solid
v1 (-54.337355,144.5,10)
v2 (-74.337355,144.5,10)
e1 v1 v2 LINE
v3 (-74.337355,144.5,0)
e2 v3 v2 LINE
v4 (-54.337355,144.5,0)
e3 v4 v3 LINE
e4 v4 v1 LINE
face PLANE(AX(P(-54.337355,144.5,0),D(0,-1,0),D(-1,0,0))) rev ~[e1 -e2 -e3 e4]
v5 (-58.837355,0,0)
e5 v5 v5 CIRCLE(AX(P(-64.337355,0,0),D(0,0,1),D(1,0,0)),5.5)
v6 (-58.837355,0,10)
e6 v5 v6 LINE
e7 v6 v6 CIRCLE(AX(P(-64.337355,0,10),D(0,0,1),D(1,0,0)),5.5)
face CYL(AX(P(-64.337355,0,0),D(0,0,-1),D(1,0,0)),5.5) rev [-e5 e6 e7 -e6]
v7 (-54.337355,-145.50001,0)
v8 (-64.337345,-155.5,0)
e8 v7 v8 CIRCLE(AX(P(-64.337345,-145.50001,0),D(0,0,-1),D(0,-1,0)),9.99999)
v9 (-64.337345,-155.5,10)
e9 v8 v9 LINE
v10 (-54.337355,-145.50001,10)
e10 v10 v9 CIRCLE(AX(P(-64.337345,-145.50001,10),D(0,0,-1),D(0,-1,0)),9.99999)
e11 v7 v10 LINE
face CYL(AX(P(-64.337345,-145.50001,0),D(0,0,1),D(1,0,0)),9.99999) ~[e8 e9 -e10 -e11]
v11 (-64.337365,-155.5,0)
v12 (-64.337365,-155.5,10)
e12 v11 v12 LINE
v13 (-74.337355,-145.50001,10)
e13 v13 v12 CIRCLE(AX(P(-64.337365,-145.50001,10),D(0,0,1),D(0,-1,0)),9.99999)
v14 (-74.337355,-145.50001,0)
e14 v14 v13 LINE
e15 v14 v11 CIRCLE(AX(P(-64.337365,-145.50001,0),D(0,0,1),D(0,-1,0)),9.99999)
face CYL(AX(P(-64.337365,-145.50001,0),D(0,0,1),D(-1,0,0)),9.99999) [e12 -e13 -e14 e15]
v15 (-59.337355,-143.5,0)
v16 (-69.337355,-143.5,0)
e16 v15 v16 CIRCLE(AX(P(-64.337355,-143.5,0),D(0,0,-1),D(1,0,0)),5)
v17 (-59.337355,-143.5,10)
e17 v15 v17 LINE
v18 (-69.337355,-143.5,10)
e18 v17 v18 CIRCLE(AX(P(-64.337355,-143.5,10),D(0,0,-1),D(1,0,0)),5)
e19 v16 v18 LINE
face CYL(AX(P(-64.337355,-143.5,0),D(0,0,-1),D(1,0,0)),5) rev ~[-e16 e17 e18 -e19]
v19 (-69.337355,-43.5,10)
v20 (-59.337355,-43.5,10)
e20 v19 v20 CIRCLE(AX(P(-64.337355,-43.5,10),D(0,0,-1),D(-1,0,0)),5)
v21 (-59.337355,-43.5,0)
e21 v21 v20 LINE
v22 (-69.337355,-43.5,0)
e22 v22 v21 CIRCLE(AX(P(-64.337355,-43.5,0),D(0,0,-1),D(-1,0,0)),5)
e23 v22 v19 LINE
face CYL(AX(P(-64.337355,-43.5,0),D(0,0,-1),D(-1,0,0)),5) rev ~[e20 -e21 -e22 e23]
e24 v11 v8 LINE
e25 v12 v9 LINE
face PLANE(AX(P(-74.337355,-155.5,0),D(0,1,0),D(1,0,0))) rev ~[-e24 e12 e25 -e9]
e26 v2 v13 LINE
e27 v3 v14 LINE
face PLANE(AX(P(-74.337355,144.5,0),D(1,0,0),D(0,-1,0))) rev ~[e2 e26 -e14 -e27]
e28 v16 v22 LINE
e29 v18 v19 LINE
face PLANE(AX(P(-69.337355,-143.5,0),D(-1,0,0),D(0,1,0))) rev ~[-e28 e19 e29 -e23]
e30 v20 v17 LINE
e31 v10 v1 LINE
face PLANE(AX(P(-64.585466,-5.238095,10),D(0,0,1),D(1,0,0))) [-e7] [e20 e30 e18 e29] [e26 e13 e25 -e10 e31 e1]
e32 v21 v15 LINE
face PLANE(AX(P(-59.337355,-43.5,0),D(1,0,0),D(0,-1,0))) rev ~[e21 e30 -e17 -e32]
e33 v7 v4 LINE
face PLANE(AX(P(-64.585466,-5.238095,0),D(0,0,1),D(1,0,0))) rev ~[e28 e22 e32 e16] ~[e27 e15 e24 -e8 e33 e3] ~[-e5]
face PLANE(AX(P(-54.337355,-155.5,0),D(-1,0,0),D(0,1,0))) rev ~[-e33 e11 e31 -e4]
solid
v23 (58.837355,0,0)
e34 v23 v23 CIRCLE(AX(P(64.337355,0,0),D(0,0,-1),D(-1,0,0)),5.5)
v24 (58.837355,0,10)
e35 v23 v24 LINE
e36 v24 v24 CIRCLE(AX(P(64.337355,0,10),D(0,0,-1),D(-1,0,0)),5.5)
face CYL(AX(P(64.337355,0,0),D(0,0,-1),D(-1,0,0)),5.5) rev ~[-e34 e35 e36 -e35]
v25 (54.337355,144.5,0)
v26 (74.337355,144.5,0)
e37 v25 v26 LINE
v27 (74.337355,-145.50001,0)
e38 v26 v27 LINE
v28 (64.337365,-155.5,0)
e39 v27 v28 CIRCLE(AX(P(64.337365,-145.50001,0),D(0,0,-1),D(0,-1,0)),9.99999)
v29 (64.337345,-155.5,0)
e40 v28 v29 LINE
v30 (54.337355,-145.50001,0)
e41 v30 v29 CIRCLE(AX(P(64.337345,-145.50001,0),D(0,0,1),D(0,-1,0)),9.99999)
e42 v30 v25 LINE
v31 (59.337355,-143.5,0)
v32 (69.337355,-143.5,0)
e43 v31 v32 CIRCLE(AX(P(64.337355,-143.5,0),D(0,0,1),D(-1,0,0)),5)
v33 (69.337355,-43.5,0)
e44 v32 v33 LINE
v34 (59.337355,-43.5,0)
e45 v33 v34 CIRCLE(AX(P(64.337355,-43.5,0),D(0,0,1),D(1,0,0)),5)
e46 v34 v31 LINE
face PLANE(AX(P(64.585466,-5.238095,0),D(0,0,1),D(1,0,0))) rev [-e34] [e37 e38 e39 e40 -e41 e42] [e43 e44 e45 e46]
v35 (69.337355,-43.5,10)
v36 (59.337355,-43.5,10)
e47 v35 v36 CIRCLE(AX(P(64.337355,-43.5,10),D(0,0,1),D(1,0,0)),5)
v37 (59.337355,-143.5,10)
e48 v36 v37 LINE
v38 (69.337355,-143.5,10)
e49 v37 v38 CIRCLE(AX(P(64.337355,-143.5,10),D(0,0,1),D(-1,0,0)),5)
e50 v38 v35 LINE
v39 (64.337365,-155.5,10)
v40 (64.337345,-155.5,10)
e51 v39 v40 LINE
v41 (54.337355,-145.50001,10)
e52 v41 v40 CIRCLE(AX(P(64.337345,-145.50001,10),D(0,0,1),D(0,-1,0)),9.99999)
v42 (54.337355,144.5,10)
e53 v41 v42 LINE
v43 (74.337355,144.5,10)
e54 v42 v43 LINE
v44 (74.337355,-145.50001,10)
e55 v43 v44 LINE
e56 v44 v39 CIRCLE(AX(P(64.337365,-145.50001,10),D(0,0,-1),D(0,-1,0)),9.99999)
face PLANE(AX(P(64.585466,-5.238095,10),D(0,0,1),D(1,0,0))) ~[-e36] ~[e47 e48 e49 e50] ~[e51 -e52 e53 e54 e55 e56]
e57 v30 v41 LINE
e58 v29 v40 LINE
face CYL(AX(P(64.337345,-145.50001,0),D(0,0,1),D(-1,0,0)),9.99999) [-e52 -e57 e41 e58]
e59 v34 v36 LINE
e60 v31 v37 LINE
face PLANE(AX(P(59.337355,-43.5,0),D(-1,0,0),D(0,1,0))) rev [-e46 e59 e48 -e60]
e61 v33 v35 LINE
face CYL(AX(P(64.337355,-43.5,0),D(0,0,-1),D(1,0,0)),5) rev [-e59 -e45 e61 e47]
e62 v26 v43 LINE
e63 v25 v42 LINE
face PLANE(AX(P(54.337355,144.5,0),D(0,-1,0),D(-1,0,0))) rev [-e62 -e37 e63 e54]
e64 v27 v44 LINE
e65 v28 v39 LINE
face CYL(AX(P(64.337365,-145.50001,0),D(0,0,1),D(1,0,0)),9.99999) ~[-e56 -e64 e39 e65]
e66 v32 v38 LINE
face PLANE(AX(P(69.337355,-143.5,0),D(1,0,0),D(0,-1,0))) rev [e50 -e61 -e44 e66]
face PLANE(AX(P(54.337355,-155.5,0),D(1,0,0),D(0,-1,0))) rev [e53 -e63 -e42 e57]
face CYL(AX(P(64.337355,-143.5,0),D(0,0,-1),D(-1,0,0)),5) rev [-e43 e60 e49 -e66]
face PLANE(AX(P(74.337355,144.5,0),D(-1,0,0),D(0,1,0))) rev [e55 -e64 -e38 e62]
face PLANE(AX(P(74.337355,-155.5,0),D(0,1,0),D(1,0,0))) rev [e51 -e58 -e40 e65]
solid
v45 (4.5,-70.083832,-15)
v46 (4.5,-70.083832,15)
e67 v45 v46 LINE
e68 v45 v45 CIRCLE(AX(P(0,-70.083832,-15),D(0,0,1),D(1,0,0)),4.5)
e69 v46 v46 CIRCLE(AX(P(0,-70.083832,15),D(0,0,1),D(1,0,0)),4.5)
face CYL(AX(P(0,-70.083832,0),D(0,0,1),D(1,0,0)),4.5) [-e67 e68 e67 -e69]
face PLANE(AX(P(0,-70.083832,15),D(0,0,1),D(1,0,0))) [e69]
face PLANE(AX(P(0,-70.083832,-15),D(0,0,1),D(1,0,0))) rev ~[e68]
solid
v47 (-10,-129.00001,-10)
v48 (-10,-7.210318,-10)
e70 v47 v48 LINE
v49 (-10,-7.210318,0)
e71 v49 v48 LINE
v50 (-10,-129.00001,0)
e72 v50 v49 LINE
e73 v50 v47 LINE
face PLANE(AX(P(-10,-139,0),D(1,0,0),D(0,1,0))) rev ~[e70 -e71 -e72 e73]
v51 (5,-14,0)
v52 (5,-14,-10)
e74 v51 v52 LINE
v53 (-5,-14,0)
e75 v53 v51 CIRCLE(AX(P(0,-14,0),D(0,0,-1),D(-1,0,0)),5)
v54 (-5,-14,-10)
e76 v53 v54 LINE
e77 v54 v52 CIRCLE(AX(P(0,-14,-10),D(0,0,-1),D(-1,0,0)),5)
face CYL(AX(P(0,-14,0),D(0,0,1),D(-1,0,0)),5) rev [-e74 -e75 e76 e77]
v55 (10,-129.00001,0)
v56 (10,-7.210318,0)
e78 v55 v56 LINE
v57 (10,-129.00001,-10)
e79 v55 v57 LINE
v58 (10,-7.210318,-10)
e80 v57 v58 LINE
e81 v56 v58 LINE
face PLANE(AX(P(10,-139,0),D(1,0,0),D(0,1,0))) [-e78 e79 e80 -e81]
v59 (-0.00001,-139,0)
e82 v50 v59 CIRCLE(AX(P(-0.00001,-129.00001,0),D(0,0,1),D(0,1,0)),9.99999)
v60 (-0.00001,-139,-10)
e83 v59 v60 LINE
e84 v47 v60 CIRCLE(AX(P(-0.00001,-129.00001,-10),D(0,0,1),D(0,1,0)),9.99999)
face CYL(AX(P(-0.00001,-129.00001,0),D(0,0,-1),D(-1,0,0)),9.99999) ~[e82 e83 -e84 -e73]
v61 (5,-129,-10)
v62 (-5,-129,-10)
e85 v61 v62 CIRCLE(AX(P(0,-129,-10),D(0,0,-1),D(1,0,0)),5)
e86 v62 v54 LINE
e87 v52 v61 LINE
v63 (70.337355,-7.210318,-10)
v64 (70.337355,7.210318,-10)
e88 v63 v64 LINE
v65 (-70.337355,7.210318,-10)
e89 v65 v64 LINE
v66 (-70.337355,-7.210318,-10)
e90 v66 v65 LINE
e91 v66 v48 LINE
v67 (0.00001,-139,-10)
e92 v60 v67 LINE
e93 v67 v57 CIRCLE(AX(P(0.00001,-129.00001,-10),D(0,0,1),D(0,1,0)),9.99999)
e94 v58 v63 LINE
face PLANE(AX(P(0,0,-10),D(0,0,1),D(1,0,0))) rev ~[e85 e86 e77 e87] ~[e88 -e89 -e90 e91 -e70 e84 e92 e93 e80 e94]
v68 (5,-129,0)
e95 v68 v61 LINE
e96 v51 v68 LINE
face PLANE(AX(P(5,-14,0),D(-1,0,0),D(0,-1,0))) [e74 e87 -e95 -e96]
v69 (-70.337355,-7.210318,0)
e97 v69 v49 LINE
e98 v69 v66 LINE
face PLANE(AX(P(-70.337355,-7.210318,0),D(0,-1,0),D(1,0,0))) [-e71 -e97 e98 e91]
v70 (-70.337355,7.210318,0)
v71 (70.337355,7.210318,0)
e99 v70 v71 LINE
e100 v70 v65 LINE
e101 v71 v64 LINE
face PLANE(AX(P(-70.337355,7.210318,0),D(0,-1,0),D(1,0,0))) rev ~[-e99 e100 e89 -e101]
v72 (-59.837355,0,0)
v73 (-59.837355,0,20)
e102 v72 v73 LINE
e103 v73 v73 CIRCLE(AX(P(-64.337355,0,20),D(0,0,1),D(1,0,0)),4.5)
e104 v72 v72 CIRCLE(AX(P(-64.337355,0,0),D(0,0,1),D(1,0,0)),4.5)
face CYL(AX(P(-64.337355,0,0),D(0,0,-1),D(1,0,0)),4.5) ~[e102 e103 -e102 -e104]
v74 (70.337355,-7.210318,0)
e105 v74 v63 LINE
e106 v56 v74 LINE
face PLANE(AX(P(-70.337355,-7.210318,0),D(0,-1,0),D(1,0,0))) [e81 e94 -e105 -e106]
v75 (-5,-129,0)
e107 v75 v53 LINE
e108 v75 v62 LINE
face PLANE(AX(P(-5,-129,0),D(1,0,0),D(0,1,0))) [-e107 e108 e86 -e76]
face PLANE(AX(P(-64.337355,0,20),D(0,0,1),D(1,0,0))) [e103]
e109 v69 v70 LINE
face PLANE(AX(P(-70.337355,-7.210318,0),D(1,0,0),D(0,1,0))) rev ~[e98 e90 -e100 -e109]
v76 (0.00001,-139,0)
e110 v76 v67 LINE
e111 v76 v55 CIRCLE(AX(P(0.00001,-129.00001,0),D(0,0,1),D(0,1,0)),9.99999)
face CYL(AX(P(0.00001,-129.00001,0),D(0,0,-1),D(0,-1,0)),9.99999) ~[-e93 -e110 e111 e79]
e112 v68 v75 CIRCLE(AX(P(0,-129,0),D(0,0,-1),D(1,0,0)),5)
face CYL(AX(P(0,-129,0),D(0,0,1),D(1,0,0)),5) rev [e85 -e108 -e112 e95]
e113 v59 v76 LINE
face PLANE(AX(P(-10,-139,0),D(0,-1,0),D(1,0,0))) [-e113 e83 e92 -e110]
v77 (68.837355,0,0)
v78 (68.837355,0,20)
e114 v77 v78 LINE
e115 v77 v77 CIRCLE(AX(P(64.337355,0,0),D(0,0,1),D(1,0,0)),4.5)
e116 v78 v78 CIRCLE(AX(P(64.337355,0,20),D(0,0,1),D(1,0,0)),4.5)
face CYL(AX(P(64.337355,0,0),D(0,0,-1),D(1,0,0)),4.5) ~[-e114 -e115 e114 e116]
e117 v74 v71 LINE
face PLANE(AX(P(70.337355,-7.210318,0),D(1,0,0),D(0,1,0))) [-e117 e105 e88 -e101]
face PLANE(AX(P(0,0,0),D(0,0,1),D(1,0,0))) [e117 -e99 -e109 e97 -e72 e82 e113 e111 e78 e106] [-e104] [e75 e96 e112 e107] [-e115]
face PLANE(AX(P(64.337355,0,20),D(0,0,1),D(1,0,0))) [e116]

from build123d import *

# Parameters (mm, degrees)
F0_W      = 140.6747102737
F0_H      = 14.4206369296
F1_DEPTH  = 10
F2_R      = 4.5
F3_DEPTH  = 20
F4_W      = 16
F4_H      = 14.4206369296
F4_R      = 5.5
F5_DEPTH  = 10
F7_R      = 4.5
F8_DEPTH  = 15
F9_W      = 20
F9_H      = 131.7896815352
F10_DEPTH = 10
F11_R     = 9.99999
F12_R     = 9.99999
F13_R     = 9.99999


# Not quite as in the source:
# - a fillet or chamfer is up to 0.001 mm smaller than in the source, because OpenCascade refuses the exact size


with BuildPart() as f1:
    # F0 (on Top) → F1 (new body)
    with BuildSketch(Plane.XY):
        Rectangle(F0_W, F0_H)
    extrude(amount=-F1_DEPTH)

    # F2 (on face) → F3 (join)
    with BuildSketch(Plane.XY):
        with Locations((-64.3373551369, 0)):
            Circle(F2_R)
        with Locations((64.3373551369, 0)):
            Circle(F2_R)
    extrude(amount=F3_DEPTH)

    # F9 (on face) → F10 (join, through all)
    with BuildSketch(Plane.XY):
        with Locations((0, -73.1051592324)):
            Rectangle(F9_W, F9_H)
        with BuildLine():
            ThreePointArc((-5, -14), (0, -9), (5, -14))
            Line((5, -14), (5, -129))
            ThreePointArc((5, -129), (0, -134), (-5, -129))
            Line((-5, -129), (-5, -14))
        make_face(mode=Mode.SUBTRACT)
    extrude(amount=-F10_DEPTH)

    # F13 (radius 10 in the source; OpenCascade refuses exactly that, so slightly less here)
    f13_edges = [f1.edges().sort_by_distance(p)[0] for p in [
        (-10, -139, -5),
        (10, -139, -5),
    ]]
    fillet(f13_edges, radius=F13_R)


with BuildPart() as f5:
    # F4 (on face) → F5 (new body)
    with BuildSketch(Plane.XY):
        Polygon((-54.3373551369, 144.5), (-74.3373551369, 144.5), (-74.3373551369, -155.5), (-54.3373551369, -155.5), (-54.3373551369, -7.2103184648), (-70.3373551369, -7.2103184648), (-70.3373551369, 7.2103184648), (-54.3373551369, 7.2103184648), align=None)
        with BuildLine():
            ThreePointArc((-69.3373551369, -43.5), (-64.3373551369, -38.5), (-59.3373551369, -43.5))
            Line((-59.3373551369, -43.5), (-59.3373551369, -143.5))
            ThreePointArc((-59.3373551369, -143.5), (-64.3373551369, -148.5), (-69.3373551369, -143.5))
            Line((-69.3373551369, -143.5), (-69.3373551369, -43.5))
        make_face(mode=Mode.SUBTRACT)
        with Locations((-62.3373551369, 0)):
            Rectangle(F4_W, F4_H)
        with Locations((-64.3373551369, 0)):
            Circle(F4_R, mode=Mode.SUBTRACT)
    extrude(amount=F5_DEPTH)


with BuildPart() as f6_1:
    # F6: instance of F5
    add(f5.part.mirror(Plane.YZ))

    # F12 (radius 10 in the source; OpenCascade refuses exactly that, so slightly less here)
    f12_edges = [f6_1.edges().sort_by_distance(p)[0] for p in [
        (54.337355, -155.5, 5),
        (74.337355, -155.5, 5),
    ]]
    fillet(f12_edges, radius=F12_R)


with BuildPart() as f8:
    # F7 (on Top) → F8 (new body, symmetric)
    with BuildSketch(Plane.XY):
        with Locations((0, -70.0838316902)):
            Circle(F7_R)
    extrude(amount=F8_DEPTH, both=True)


with BuildPart() as f5_1:
    add(f5.part)

    # F11 (radius 10 in the source; OpenCascade refuses exactly that, so slightly less here)
    f11_edges = [f5_1.edges().sort_by_distance(p)[0] for p in [
        (-74.337355, -155.5, 5),
        (-54.337355, -155.5, 5),
    ]]
    fillet(f11_edges, radius=F11_R)


solid = Compound([f1.part, f6_1.part, f8.part, f5_1.part])
